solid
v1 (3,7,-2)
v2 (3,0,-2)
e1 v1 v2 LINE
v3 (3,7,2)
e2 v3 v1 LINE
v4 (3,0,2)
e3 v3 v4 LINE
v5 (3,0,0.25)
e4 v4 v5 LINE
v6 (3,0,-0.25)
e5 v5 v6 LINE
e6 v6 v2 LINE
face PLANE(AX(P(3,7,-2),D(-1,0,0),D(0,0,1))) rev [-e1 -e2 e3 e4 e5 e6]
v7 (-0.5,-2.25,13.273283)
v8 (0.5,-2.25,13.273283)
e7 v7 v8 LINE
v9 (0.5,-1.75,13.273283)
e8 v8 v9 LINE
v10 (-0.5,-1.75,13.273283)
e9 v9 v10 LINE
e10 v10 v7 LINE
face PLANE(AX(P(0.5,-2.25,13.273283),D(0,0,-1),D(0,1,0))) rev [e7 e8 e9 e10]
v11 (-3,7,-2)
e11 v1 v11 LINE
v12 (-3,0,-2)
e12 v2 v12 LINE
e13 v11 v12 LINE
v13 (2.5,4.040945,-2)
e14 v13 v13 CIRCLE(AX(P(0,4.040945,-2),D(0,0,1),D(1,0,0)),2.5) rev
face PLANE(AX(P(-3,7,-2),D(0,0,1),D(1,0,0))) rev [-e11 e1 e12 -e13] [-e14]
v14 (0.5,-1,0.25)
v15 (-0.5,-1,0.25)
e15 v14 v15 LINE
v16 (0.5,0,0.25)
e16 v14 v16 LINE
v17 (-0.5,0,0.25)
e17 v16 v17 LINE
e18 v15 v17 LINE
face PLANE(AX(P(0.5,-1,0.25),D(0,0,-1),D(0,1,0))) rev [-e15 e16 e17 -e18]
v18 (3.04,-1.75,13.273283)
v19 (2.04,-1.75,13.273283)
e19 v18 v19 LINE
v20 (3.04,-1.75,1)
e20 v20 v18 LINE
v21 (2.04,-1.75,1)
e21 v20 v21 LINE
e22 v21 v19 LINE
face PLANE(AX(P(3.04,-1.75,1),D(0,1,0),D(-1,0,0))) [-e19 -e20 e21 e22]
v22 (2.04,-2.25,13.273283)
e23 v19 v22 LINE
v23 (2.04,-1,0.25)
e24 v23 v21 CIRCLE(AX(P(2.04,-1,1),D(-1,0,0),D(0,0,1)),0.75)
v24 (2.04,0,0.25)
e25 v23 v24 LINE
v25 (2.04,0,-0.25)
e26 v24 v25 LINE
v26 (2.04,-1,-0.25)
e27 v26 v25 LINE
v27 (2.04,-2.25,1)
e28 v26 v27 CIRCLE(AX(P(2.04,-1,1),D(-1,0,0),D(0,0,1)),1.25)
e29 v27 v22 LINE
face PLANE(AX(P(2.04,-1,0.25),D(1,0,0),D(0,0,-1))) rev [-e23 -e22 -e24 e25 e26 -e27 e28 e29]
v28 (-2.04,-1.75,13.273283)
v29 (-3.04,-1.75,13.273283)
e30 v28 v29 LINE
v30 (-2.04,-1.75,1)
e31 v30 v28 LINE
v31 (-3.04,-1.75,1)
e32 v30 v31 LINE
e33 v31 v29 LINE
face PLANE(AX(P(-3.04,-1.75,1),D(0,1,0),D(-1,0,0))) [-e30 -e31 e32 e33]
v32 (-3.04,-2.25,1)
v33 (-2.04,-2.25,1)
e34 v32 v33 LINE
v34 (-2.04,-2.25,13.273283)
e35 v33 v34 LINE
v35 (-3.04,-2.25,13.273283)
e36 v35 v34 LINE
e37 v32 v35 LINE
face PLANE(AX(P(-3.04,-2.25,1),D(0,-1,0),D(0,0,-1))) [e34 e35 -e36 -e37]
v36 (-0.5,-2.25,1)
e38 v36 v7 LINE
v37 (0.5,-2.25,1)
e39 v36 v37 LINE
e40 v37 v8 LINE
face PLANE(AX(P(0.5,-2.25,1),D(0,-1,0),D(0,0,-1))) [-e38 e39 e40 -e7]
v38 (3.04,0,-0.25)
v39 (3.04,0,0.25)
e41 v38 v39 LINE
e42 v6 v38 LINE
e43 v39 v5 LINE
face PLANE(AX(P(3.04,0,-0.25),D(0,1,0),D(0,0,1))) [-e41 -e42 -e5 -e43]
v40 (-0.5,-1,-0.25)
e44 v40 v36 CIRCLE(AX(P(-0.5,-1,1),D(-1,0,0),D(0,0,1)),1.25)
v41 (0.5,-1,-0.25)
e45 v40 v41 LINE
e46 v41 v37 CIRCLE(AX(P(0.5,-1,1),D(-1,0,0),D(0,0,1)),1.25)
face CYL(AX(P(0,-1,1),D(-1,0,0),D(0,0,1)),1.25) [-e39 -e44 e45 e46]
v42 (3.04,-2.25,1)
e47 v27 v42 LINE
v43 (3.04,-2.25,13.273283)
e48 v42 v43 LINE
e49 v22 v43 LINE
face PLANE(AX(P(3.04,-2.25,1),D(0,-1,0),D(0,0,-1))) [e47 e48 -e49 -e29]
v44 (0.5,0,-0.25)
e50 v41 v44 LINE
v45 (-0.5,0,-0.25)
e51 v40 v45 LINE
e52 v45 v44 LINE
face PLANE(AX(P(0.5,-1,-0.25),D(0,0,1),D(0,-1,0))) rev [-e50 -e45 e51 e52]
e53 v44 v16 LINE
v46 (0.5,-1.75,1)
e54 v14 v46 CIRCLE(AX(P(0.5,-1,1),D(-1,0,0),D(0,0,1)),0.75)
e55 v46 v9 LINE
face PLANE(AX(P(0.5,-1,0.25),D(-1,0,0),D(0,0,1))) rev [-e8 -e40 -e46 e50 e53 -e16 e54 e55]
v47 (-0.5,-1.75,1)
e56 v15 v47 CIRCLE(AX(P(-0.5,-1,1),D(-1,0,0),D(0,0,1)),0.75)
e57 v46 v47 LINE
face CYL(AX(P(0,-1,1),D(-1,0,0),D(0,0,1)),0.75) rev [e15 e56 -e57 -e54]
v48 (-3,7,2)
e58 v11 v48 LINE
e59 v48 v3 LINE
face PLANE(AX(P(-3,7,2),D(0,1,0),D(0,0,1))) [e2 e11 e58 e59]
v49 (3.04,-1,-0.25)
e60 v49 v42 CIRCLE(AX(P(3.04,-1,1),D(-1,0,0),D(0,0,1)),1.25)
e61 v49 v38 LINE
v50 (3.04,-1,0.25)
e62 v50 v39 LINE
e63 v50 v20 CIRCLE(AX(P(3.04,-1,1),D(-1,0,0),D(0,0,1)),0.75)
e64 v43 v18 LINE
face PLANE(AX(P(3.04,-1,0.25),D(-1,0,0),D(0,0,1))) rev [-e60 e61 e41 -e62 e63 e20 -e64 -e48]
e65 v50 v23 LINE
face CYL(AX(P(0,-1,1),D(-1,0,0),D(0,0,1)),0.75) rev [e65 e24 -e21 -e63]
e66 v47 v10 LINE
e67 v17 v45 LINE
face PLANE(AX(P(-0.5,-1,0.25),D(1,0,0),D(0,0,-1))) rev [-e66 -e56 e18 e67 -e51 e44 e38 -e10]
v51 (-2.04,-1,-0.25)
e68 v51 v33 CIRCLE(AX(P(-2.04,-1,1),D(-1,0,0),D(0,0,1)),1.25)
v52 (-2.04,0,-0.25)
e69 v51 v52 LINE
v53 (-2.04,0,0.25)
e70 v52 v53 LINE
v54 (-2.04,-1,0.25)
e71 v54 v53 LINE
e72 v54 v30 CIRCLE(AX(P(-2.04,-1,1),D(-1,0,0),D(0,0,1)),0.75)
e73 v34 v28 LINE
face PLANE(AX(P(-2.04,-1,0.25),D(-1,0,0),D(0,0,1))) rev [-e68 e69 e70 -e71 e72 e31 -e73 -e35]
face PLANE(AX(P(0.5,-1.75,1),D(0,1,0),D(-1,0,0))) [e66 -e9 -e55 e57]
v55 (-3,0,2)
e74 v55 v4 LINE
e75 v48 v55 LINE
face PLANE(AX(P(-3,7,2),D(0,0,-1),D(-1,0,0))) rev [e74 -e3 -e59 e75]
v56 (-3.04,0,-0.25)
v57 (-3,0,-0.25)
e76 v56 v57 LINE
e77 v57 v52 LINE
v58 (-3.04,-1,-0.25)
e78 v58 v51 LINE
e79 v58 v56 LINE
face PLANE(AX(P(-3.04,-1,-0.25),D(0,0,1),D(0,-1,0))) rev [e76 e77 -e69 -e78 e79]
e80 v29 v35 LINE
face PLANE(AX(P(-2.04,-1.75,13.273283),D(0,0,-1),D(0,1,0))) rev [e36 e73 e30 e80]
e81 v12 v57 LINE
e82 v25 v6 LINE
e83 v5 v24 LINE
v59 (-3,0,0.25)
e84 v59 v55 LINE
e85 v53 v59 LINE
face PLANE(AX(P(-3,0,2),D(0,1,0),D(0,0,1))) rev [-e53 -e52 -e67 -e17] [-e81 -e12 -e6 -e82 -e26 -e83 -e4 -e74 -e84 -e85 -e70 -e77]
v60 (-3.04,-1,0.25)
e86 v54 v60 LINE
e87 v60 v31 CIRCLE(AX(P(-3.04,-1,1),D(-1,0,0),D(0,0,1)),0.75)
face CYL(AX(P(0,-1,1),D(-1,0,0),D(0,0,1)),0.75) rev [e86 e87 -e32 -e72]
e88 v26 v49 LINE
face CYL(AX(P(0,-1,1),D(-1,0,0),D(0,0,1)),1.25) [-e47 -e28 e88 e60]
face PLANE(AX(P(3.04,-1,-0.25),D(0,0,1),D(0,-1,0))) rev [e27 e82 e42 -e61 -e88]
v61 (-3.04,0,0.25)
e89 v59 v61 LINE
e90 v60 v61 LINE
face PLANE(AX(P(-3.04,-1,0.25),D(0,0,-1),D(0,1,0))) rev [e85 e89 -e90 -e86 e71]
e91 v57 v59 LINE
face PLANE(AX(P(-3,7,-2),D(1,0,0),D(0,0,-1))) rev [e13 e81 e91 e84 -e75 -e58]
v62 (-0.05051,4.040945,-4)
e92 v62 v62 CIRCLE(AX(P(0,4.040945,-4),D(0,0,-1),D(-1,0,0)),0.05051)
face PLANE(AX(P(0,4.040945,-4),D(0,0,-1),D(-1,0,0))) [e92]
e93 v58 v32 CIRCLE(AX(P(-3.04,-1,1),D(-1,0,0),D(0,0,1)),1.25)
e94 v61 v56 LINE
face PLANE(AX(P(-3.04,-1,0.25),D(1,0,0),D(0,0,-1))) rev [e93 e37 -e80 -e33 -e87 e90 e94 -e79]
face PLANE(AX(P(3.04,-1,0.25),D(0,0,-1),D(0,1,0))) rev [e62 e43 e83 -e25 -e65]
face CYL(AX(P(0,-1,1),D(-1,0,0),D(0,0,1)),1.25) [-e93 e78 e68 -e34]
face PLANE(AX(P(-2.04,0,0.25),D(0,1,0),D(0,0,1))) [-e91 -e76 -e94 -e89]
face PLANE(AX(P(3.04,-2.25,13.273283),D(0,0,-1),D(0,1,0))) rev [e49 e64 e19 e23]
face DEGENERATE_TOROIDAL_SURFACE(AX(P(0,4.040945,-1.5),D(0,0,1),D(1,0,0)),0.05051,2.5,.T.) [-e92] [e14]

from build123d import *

# Parameters (mm, degrees)
SKETCH_1_W      = 6
SKETCH_1_H      = 4
EXTRUDE_1_DEPTH = 7
SKETCH_2_R      = 2.5
EXTRUDE_2_DEPTH = 2
FILLET_1_R      = 2.5
SKETCH_3_W      = 1
SKETCH_3_H      = 0.5


with BuildPart() as part:
    # 草图1 → 拉伸1 (new body)
    with BuildSketch(Plane(origin=(0, 0, 0), x_dir=(1, 0, 0), z_dir=(0, 1, 0))):
        Rectangle(SKETCH_1_W, SKETCH_1_H)
    extrude(amount=EXTRUDE_1_DEPTH)

    # 草图2 → 拉伸2 (add)
    with BuildSketch(Plane(origin=(0, 0, -2), x_dir=(-1, 0, 0), z_dir=(0, 0, -1))):
        with Locations(Location((0, 4.040945029, 0), (0, 0, 180))):
            Circle(SKETCH_2_R)
    extrude(amount=EXTRUDE_2_DEPTH)

    # 圆角1
    # the kernel refuses this fillet: 2.5 mm, written as the material it takes off along each edge
    with BuildSketch(Plane(origin=(0, 4.040945029, -4), x_dir=(1, 0, 0), z_dir=(0, 1, 0))) as fillet_1_piece_1:
        with BuildLine():
            CenterArc((0.050510257, -2.5), FILLET_1_R, 11.536959033, 78.463040967)
            Line((0.050510257, 0), (0.050510257, 0.05))
            Line((0.050510257, 0.05), (2.5, 0.05))
            Line((2.5, 0.05), (2.55, 0))
            ThreePointArc((2.55, 0), (2.55, -1), (2.548989795, -1.99))
            Line((2.548989795, -1.99), (2.5, -2))
        make_face()
    revolve(axis=Axis((0, 4.040945029, -4), (0, 0, -1)), mode=Mode.SUBTRACT)

    # 扫描1: sweep along a path in 草图4
    with BuildLine(Plane(origin=(0, 0, 0), x_dir=(0, 0, -1), z_dir=(1, 0, 0))) as sweep_1_path:
        Line((0, 0), (0, -1))
        ThreePointArc((0, -1), (-0.292893219, -1.707106781), (-1, -2))
        Line((-1, -2), (-13.273282855, -2))
    # 草图3 → 扫描1 (sweep)
    with BuildSketch(Plane.XZ):
        Rectangle(SKETCH_3_W, SKETCH_3_H)
        with Locations((2.54, 0)):
            Rectangle(SKETCH_3_W, SKETCH_3_H)
        with Locations((-2.54, 0)):
            Rectangle(SKETCH_3_W, SKETCH_3_H)
    sweep(path=sweep_1_path.line)


solid = part.part
